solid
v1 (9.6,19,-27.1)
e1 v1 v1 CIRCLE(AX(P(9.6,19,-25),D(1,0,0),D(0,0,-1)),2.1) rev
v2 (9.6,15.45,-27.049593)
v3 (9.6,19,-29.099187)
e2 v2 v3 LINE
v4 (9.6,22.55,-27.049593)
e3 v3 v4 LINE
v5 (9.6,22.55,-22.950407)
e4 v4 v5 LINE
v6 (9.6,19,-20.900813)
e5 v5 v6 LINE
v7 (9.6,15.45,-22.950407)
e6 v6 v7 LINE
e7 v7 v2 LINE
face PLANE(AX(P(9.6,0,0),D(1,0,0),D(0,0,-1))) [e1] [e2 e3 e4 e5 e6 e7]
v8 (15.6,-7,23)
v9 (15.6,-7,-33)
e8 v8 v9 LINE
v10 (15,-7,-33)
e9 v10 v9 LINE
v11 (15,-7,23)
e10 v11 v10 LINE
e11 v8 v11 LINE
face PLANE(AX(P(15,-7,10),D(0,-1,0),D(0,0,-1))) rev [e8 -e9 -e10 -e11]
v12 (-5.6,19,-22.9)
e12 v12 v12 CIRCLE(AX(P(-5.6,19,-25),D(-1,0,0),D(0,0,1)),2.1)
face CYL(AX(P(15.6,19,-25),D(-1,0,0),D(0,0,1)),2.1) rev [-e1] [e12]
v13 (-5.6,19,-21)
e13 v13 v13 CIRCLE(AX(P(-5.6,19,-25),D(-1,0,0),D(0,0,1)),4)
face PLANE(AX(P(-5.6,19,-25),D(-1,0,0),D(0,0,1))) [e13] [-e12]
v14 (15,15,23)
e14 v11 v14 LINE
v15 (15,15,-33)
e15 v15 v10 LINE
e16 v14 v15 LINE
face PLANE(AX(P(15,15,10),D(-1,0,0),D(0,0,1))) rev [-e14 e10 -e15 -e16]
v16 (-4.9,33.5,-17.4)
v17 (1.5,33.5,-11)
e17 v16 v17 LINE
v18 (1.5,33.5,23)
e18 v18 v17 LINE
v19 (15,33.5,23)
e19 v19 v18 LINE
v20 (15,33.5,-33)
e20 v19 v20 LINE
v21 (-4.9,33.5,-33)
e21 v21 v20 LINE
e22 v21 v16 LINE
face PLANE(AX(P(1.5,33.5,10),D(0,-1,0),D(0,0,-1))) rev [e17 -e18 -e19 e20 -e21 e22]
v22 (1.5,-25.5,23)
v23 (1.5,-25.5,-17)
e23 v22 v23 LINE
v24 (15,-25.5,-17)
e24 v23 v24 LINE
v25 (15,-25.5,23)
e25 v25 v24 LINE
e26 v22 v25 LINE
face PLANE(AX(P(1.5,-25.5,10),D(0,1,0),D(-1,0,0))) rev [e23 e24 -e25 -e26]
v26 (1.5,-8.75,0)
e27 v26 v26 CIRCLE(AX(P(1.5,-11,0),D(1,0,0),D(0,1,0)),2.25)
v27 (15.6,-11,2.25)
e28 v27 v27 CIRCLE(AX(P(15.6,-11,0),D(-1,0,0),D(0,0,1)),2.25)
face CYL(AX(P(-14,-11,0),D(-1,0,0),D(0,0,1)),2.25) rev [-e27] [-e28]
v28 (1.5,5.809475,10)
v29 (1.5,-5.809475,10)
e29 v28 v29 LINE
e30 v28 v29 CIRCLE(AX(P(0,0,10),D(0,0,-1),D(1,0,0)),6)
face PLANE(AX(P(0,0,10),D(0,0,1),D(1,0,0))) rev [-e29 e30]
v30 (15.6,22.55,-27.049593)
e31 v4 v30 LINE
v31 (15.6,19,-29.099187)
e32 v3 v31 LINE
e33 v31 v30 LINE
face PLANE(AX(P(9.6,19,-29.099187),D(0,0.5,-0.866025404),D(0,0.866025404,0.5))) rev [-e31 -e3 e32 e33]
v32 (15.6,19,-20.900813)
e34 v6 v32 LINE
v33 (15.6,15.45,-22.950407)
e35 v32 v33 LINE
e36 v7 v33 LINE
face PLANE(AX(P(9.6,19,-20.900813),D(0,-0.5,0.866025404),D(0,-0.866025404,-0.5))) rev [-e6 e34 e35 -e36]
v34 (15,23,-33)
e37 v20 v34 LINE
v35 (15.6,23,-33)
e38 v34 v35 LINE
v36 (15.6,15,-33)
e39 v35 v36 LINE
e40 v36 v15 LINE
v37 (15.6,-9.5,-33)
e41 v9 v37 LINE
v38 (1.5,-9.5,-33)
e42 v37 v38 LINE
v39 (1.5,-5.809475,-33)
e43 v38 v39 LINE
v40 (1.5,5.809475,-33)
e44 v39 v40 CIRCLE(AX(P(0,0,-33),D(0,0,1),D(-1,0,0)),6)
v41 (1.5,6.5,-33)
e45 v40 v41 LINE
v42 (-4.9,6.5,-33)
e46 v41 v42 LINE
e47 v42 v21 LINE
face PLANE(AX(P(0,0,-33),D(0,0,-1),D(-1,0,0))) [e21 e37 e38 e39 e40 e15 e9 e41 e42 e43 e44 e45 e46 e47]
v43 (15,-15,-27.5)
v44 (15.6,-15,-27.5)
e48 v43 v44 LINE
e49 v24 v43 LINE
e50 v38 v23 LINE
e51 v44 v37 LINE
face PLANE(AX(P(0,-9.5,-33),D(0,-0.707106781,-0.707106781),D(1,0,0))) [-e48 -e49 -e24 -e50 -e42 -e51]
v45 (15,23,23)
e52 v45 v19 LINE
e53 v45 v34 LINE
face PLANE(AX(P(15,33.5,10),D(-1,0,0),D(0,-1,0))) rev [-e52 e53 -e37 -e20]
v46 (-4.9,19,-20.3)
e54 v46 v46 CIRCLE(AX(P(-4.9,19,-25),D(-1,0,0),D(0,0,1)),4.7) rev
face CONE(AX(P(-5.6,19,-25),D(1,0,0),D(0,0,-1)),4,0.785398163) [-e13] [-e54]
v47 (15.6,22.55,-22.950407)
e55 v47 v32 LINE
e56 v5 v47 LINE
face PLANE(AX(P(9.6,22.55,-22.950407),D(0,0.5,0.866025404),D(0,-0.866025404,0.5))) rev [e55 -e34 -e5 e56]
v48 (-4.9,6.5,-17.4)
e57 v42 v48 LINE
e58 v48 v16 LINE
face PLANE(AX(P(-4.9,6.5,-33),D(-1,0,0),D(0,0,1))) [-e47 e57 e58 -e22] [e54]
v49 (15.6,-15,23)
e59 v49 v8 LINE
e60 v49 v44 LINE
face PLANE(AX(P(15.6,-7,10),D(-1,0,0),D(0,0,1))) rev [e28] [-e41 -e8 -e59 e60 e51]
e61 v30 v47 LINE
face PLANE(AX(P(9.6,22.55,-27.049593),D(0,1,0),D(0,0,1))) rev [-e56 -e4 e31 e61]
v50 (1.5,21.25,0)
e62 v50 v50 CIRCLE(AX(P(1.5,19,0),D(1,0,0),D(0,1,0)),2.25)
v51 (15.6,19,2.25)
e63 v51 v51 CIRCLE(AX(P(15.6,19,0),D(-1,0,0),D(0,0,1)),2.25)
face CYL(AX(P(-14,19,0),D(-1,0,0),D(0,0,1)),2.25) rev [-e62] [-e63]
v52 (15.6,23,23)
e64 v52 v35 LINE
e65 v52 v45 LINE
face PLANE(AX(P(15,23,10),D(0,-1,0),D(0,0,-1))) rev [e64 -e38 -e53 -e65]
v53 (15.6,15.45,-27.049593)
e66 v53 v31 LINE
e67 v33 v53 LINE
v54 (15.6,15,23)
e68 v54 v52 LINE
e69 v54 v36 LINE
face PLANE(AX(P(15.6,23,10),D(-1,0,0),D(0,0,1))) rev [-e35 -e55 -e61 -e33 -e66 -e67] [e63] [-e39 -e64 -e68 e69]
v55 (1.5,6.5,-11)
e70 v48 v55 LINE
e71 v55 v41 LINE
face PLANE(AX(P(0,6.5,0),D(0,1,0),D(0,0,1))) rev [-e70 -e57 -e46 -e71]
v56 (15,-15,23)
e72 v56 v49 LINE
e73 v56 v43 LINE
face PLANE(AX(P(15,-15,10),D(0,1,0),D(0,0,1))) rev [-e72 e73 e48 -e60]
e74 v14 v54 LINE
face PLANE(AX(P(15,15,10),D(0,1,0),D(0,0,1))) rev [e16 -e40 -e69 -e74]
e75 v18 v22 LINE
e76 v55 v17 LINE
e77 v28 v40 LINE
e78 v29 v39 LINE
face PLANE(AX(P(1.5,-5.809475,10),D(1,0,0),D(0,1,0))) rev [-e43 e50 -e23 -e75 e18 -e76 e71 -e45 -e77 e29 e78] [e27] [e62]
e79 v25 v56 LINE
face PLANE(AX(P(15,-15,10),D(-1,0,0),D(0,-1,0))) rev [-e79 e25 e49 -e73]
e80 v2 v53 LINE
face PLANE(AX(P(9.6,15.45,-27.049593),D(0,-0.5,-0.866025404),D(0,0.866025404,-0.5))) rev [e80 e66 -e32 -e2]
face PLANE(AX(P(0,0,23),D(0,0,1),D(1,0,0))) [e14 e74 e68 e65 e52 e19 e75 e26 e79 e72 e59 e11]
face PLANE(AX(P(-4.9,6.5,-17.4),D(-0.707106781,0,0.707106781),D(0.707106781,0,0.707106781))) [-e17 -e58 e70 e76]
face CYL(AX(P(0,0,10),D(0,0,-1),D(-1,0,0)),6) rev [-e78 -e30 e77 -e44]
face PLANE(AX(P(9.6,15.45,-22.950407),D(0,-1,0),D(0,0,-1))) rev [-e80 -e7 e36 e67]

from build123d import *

# Parameters (mm, degrees)
BOSS_EXTRUDE1_DEPTH                          = 10
BOSS_EXTRUDE1_2_DEPTH                        = 10
CBORE_FOR_M5_HEX_SOCKET_HEAD_CAP_SCR_2_COUNT = 2
CBORE_FOR_M5_HEX_SOCKET_HEAD_CAP_SCR_2_PITCH = 30
BOSS_EXTRUDE2_DEPTH                          = 13
BOSS_EXTRUDE3_DEPTH                          = 23
BOSS_EXTRUDE4_DEPTH                          = 27
SKETCH8_R                                    = 2.1
CUT_EXTRUDE1_DEPTH                           = 52.298148115
CHAMFER1_SIZE                                = 16
CUT_EXTRUDE2_DEPTH                           = 6
SKETCH10_R                                   = 5
SKETCH10_R_2                                 = 2.1
BOSS_EXTRUDE5_DEPTH                          = 0.7
CHAMFER2_SIZE                                = 1


with BuildPart() as part:
    # Sketch1 → Boss-Extrude1 (new, symmetric)
    with BuildSketch(Plane.XY):
        with BuildLine():
            Line((-14, 32.5), (-1.5, 32.5))
            Line((-1.5, 32.5), (-1.5, 5.809475019))
            ThreePointArc((-1.5, 5.809475019), (-6, 0), (-1.5, -5.809475019))
            Line((-1.5, -5.809475019), (-1.5, -24.5))
            Line((-1.5, -24.5), (-14, -24.5))
            Line((-14, -24.5), (-14, 32.5))
        make_face()
    extrude(amount=BOSS_EXTRUDE1_DEPTH, both=True)


with BuildPart() as body_2:
    # Sketch1 → Boss-Extrude1 2 (new, symmetric)
    with BuildSketch(Plane.XY):
        with BuildLine():
            Line((15, 33.5), (15, 23))
            Line((15, 23), (15.6, 23))
            Line((15.6, 23), (15.6, 15))
            Line((15.6, 15), (15, 15))
            Line((15, 15), (15, -7))
            Line((15, -7), (15.6, -7))
            Line((15.6, -7), (15.6, -15))
            Line((15.6, -15), (15, -15))
            Line((15, -15), (15, -25.5))
            Line((15, -25.5), (1.5, -25.5))
            Line((1.5, -25.5), (1.5, -5.809475019))
            ThreePointArc((1.5, -5.809475019), (6, 0), (1.5, 5.809475019))
            Line((1.5, 5.809475019), (1.5, 33.5))
            Line((1.5, 33.5), (15, 33.5))
        make_face()
    extrude(amount=BOSS_EXTRUDE1_2_DEPTH, both=True)


with BuildPart() as cbore_for_m5_hex_socket_head_cap_screw1_tool:
    # Sketch2 → CBORE for M5 Hex Socket Head Cap Screw1 (revolve)
    with BuildSketch(Plane(origin=(-14, -11, 0), x_dir=(0, 0, 1), z_dir=(0, 1, 0))):
        Polygon((0, 0), (0, 29.6), (2.25, 29.6), (2.25, 5.9), (5, 5.9), (5, 0), align=None)
    cbore_for_m5_hex_socket_head_cap_screw1 = revolve(axis=Axis((-20.35, -11, 0), (1, 0, 0)))


with BuildPart() as part_1:
    add(part.part)

    # CBORE for M5 Hex Socket Head Cap Screw1: cut by cbore_for_m5_hex_socket_head_cap_screw1_tool
    add(cbore_for_m5_hex_socket_head_cap_screw1_tool.part, mode=Mode.SUBTRACT)


with BuildPart() as body_2_1:
    add(body_2.part)

    # CBORE for M5 Hex Socket Head Cap Screw1: cut by cbore_for_m5_hex_socket_head_cap_screw1_tool
    add(cbore_for_m5_hex_socket_head_cap_screw1_tool.part, mode=Mode.SUBTRACT)


with BuildPart() as cbore_for_m5_hex_socket_head_cap_scr_2_tool:
    # CBORE for M5 Hex Socket Head Cap Scr 2: CBORE for M5 Hex Socket Head Cap Screw1 ×2
    with Locations(*[(0, i * CBORE_FOR_M5_HEX_SOCKET_HEAD_CAP_SCR_2_PITCH, 0) for i in range(1, CBORE_FOR_M5_HEX_SOCKET_HEAD_CAP_SCR_2_COUNT)]):
        add(cbore_for_m5_hex_socket_head_cap_screw1)


with BuildPart() as part_2:
    add(part_1.part)

    # CBORE for M5 Hex Socket Head Cap Scr 2: cut by cbore_for_m5_hex_socket_head_cap_scr_2_tool
    add(cbore_for_m5_hex_socket_head_cap_scr_2_tool.part, mode=Mode.SUBTRACT)


with BuildPart() as body_2_2:
    add(body_2_1.part)

    # CBORE for M5 Hex Socket Head Cap Scr 2: cut by cbore_for_m5_hex_socket_head_cap_scr_2_tool
    add(cbore_for_m5_hex_socket_head_cap_scr_2_tool.part, mode=Mode.SUBTRACT)

    # Sketch4 → Boss-Extrude2 (add)
    with BuildSketch(Plane.XY.offset(10)):
        Polygon((1.5, 5.809475019), (1.5, -5.809475019), (1.5, -25.5), (15, -25.5), (15, -15), (15.6, -15), (15.6, -7), (15, -7), (15, 15), (15.6, 15), (15.6, 23), (15, 23), (15, 33.5), (1.5, 33.5), align=None)
    extrude(amount=BOSS_EXTRUDE2_DEPTH)

    # Sketch5 → Boss-Extrude3 (add)
    with BuildSketch(Plane(origin=(0, 0, -10), x_dir=(-1, 0, 0), z_dir=(0, 0, -1))):
        with BuildLine():
            Line((-15, -25.5), (-1.5, -25.5))
            Line((-1.5, -25.5), (-1.5, -5.809475019))
            ThreePointArc((-1.5, -5.809475019), (-6, 0), (-1.5, 5.809475019))
            Line((-1.5, 5.809475019), (-1.5, 33.5))
            Line((-1.5, 33.5), (-15, 33.5))
            Line((-15, 33.5), (-15, 23))
            Line((-15, 23), (-15.6, 23))
            Line((-15.6, 23), (-15.6, 15))
            Line((-15.6, 15), (-15, 15))
            Line((-15, 15), (-15, -7))
            Line((-15, -7), (-15.6, -7))
            Line((-15.6, -7), (-15.6, -15))
            Line((-15.6, -15), (-15, -15))
            Line((-15, -15), (-15, -25.5))
        make_face()
    extrude(amount=BOSS_EXTRUDE3_DEPTH)

    # Sketch7 → Boss-Extrude4 (add)
    with BuildSketch(Plane(origin=(0, 33.5, 0), x_dir=(1, 0, 0), z_dir=(0, 1, 0))):
        Polygon((1.5, 33), (-4.9, 33), (-4.9, 17.4), (1.5, 11), align=None)
    extrude(amount=-BOSS_EXTRUDE4_DEPTH)

    # Sketch8 → Cut-Extrude1 (cut, through all)
    with BuildSketch(Plane.ZY.offset(4.9)):
        with Locations((-25, 19)):
            Circle(SKETCH8_R)
    extrude(amount=-CUT_EXTRUDE1_DEPTH, mode=Mode.SUBTRACT)

    # Chamfer1
    chamfer1_edges = [body_2_2.edges().sort_by_distance(p)[0] for p in [
        (8.25, -25.5, -33),
    ]]
    chamfer(chamfer1_edges, length=CHAMFER1_SIZE)

    # Sketch9 → Cut-Extrude2 (cut)
    with BuildSketch(Plane(origin=(15.6, 0, 0), x_dir=(0, 0, -1), z_dir=(1, 0, 0))):
        Polygon((29.099186911, 19), (27.049593456, 22.55), (22.950406544, 22.55), (20.900813089, 19), (22.950406544, 15.45), (27.049593456, 15.45), align=None)
    extrude(amount=-CUT_EXTRUDE2_DEPTH, mode=Mode.SUBTRACT)

    # Sketch10 → Boss-Extrude5 (add)
    with BuildSketch(Plane.ZY.offset(4.9)):
        with Locations((-25, 19)):
            Circle(SKETCH10_R)
        with Locations((-25, 19)):
            Circle(SKETCH10_R_2, mode=Mode.SUBTRACT)
    extrude(amount=BOSS_EXTRUDE5_DEPTH)

    # Chamfer2
    # the kernel refuses this chamfer: 1 mm, written as the material it takes off along each edge
    with BuildSketch(Plane(origin=(-5.6, 19, -25), x_dir=(0, 0, 1), z_dir=(0, -1, 0))) as chamfer2_piece_1_section:
        Polygon((5, -CHAMFER2_SIZE), (5 - CHAMFER2_SIZE, 0), (5, 0), align=None)
    chamfer2_piece_1 = revolve(axis=Axis((-5.6, 19, -25), (-1, 0, 0)), mode=Mode.PRIVATE)
    chamfer2_piece_1 = split(chamfer2_piece_1, bisect_by=Plane(origin=(-4.9, 19, -29.353058273), z_dir=(-1, 0, 0)), keep=Keep.TOP, mode=Mode.PRIVATE)
    add(chamfer2_piece_1, mode=Mode.SUBTRACT)


solid = body_2_2.part
